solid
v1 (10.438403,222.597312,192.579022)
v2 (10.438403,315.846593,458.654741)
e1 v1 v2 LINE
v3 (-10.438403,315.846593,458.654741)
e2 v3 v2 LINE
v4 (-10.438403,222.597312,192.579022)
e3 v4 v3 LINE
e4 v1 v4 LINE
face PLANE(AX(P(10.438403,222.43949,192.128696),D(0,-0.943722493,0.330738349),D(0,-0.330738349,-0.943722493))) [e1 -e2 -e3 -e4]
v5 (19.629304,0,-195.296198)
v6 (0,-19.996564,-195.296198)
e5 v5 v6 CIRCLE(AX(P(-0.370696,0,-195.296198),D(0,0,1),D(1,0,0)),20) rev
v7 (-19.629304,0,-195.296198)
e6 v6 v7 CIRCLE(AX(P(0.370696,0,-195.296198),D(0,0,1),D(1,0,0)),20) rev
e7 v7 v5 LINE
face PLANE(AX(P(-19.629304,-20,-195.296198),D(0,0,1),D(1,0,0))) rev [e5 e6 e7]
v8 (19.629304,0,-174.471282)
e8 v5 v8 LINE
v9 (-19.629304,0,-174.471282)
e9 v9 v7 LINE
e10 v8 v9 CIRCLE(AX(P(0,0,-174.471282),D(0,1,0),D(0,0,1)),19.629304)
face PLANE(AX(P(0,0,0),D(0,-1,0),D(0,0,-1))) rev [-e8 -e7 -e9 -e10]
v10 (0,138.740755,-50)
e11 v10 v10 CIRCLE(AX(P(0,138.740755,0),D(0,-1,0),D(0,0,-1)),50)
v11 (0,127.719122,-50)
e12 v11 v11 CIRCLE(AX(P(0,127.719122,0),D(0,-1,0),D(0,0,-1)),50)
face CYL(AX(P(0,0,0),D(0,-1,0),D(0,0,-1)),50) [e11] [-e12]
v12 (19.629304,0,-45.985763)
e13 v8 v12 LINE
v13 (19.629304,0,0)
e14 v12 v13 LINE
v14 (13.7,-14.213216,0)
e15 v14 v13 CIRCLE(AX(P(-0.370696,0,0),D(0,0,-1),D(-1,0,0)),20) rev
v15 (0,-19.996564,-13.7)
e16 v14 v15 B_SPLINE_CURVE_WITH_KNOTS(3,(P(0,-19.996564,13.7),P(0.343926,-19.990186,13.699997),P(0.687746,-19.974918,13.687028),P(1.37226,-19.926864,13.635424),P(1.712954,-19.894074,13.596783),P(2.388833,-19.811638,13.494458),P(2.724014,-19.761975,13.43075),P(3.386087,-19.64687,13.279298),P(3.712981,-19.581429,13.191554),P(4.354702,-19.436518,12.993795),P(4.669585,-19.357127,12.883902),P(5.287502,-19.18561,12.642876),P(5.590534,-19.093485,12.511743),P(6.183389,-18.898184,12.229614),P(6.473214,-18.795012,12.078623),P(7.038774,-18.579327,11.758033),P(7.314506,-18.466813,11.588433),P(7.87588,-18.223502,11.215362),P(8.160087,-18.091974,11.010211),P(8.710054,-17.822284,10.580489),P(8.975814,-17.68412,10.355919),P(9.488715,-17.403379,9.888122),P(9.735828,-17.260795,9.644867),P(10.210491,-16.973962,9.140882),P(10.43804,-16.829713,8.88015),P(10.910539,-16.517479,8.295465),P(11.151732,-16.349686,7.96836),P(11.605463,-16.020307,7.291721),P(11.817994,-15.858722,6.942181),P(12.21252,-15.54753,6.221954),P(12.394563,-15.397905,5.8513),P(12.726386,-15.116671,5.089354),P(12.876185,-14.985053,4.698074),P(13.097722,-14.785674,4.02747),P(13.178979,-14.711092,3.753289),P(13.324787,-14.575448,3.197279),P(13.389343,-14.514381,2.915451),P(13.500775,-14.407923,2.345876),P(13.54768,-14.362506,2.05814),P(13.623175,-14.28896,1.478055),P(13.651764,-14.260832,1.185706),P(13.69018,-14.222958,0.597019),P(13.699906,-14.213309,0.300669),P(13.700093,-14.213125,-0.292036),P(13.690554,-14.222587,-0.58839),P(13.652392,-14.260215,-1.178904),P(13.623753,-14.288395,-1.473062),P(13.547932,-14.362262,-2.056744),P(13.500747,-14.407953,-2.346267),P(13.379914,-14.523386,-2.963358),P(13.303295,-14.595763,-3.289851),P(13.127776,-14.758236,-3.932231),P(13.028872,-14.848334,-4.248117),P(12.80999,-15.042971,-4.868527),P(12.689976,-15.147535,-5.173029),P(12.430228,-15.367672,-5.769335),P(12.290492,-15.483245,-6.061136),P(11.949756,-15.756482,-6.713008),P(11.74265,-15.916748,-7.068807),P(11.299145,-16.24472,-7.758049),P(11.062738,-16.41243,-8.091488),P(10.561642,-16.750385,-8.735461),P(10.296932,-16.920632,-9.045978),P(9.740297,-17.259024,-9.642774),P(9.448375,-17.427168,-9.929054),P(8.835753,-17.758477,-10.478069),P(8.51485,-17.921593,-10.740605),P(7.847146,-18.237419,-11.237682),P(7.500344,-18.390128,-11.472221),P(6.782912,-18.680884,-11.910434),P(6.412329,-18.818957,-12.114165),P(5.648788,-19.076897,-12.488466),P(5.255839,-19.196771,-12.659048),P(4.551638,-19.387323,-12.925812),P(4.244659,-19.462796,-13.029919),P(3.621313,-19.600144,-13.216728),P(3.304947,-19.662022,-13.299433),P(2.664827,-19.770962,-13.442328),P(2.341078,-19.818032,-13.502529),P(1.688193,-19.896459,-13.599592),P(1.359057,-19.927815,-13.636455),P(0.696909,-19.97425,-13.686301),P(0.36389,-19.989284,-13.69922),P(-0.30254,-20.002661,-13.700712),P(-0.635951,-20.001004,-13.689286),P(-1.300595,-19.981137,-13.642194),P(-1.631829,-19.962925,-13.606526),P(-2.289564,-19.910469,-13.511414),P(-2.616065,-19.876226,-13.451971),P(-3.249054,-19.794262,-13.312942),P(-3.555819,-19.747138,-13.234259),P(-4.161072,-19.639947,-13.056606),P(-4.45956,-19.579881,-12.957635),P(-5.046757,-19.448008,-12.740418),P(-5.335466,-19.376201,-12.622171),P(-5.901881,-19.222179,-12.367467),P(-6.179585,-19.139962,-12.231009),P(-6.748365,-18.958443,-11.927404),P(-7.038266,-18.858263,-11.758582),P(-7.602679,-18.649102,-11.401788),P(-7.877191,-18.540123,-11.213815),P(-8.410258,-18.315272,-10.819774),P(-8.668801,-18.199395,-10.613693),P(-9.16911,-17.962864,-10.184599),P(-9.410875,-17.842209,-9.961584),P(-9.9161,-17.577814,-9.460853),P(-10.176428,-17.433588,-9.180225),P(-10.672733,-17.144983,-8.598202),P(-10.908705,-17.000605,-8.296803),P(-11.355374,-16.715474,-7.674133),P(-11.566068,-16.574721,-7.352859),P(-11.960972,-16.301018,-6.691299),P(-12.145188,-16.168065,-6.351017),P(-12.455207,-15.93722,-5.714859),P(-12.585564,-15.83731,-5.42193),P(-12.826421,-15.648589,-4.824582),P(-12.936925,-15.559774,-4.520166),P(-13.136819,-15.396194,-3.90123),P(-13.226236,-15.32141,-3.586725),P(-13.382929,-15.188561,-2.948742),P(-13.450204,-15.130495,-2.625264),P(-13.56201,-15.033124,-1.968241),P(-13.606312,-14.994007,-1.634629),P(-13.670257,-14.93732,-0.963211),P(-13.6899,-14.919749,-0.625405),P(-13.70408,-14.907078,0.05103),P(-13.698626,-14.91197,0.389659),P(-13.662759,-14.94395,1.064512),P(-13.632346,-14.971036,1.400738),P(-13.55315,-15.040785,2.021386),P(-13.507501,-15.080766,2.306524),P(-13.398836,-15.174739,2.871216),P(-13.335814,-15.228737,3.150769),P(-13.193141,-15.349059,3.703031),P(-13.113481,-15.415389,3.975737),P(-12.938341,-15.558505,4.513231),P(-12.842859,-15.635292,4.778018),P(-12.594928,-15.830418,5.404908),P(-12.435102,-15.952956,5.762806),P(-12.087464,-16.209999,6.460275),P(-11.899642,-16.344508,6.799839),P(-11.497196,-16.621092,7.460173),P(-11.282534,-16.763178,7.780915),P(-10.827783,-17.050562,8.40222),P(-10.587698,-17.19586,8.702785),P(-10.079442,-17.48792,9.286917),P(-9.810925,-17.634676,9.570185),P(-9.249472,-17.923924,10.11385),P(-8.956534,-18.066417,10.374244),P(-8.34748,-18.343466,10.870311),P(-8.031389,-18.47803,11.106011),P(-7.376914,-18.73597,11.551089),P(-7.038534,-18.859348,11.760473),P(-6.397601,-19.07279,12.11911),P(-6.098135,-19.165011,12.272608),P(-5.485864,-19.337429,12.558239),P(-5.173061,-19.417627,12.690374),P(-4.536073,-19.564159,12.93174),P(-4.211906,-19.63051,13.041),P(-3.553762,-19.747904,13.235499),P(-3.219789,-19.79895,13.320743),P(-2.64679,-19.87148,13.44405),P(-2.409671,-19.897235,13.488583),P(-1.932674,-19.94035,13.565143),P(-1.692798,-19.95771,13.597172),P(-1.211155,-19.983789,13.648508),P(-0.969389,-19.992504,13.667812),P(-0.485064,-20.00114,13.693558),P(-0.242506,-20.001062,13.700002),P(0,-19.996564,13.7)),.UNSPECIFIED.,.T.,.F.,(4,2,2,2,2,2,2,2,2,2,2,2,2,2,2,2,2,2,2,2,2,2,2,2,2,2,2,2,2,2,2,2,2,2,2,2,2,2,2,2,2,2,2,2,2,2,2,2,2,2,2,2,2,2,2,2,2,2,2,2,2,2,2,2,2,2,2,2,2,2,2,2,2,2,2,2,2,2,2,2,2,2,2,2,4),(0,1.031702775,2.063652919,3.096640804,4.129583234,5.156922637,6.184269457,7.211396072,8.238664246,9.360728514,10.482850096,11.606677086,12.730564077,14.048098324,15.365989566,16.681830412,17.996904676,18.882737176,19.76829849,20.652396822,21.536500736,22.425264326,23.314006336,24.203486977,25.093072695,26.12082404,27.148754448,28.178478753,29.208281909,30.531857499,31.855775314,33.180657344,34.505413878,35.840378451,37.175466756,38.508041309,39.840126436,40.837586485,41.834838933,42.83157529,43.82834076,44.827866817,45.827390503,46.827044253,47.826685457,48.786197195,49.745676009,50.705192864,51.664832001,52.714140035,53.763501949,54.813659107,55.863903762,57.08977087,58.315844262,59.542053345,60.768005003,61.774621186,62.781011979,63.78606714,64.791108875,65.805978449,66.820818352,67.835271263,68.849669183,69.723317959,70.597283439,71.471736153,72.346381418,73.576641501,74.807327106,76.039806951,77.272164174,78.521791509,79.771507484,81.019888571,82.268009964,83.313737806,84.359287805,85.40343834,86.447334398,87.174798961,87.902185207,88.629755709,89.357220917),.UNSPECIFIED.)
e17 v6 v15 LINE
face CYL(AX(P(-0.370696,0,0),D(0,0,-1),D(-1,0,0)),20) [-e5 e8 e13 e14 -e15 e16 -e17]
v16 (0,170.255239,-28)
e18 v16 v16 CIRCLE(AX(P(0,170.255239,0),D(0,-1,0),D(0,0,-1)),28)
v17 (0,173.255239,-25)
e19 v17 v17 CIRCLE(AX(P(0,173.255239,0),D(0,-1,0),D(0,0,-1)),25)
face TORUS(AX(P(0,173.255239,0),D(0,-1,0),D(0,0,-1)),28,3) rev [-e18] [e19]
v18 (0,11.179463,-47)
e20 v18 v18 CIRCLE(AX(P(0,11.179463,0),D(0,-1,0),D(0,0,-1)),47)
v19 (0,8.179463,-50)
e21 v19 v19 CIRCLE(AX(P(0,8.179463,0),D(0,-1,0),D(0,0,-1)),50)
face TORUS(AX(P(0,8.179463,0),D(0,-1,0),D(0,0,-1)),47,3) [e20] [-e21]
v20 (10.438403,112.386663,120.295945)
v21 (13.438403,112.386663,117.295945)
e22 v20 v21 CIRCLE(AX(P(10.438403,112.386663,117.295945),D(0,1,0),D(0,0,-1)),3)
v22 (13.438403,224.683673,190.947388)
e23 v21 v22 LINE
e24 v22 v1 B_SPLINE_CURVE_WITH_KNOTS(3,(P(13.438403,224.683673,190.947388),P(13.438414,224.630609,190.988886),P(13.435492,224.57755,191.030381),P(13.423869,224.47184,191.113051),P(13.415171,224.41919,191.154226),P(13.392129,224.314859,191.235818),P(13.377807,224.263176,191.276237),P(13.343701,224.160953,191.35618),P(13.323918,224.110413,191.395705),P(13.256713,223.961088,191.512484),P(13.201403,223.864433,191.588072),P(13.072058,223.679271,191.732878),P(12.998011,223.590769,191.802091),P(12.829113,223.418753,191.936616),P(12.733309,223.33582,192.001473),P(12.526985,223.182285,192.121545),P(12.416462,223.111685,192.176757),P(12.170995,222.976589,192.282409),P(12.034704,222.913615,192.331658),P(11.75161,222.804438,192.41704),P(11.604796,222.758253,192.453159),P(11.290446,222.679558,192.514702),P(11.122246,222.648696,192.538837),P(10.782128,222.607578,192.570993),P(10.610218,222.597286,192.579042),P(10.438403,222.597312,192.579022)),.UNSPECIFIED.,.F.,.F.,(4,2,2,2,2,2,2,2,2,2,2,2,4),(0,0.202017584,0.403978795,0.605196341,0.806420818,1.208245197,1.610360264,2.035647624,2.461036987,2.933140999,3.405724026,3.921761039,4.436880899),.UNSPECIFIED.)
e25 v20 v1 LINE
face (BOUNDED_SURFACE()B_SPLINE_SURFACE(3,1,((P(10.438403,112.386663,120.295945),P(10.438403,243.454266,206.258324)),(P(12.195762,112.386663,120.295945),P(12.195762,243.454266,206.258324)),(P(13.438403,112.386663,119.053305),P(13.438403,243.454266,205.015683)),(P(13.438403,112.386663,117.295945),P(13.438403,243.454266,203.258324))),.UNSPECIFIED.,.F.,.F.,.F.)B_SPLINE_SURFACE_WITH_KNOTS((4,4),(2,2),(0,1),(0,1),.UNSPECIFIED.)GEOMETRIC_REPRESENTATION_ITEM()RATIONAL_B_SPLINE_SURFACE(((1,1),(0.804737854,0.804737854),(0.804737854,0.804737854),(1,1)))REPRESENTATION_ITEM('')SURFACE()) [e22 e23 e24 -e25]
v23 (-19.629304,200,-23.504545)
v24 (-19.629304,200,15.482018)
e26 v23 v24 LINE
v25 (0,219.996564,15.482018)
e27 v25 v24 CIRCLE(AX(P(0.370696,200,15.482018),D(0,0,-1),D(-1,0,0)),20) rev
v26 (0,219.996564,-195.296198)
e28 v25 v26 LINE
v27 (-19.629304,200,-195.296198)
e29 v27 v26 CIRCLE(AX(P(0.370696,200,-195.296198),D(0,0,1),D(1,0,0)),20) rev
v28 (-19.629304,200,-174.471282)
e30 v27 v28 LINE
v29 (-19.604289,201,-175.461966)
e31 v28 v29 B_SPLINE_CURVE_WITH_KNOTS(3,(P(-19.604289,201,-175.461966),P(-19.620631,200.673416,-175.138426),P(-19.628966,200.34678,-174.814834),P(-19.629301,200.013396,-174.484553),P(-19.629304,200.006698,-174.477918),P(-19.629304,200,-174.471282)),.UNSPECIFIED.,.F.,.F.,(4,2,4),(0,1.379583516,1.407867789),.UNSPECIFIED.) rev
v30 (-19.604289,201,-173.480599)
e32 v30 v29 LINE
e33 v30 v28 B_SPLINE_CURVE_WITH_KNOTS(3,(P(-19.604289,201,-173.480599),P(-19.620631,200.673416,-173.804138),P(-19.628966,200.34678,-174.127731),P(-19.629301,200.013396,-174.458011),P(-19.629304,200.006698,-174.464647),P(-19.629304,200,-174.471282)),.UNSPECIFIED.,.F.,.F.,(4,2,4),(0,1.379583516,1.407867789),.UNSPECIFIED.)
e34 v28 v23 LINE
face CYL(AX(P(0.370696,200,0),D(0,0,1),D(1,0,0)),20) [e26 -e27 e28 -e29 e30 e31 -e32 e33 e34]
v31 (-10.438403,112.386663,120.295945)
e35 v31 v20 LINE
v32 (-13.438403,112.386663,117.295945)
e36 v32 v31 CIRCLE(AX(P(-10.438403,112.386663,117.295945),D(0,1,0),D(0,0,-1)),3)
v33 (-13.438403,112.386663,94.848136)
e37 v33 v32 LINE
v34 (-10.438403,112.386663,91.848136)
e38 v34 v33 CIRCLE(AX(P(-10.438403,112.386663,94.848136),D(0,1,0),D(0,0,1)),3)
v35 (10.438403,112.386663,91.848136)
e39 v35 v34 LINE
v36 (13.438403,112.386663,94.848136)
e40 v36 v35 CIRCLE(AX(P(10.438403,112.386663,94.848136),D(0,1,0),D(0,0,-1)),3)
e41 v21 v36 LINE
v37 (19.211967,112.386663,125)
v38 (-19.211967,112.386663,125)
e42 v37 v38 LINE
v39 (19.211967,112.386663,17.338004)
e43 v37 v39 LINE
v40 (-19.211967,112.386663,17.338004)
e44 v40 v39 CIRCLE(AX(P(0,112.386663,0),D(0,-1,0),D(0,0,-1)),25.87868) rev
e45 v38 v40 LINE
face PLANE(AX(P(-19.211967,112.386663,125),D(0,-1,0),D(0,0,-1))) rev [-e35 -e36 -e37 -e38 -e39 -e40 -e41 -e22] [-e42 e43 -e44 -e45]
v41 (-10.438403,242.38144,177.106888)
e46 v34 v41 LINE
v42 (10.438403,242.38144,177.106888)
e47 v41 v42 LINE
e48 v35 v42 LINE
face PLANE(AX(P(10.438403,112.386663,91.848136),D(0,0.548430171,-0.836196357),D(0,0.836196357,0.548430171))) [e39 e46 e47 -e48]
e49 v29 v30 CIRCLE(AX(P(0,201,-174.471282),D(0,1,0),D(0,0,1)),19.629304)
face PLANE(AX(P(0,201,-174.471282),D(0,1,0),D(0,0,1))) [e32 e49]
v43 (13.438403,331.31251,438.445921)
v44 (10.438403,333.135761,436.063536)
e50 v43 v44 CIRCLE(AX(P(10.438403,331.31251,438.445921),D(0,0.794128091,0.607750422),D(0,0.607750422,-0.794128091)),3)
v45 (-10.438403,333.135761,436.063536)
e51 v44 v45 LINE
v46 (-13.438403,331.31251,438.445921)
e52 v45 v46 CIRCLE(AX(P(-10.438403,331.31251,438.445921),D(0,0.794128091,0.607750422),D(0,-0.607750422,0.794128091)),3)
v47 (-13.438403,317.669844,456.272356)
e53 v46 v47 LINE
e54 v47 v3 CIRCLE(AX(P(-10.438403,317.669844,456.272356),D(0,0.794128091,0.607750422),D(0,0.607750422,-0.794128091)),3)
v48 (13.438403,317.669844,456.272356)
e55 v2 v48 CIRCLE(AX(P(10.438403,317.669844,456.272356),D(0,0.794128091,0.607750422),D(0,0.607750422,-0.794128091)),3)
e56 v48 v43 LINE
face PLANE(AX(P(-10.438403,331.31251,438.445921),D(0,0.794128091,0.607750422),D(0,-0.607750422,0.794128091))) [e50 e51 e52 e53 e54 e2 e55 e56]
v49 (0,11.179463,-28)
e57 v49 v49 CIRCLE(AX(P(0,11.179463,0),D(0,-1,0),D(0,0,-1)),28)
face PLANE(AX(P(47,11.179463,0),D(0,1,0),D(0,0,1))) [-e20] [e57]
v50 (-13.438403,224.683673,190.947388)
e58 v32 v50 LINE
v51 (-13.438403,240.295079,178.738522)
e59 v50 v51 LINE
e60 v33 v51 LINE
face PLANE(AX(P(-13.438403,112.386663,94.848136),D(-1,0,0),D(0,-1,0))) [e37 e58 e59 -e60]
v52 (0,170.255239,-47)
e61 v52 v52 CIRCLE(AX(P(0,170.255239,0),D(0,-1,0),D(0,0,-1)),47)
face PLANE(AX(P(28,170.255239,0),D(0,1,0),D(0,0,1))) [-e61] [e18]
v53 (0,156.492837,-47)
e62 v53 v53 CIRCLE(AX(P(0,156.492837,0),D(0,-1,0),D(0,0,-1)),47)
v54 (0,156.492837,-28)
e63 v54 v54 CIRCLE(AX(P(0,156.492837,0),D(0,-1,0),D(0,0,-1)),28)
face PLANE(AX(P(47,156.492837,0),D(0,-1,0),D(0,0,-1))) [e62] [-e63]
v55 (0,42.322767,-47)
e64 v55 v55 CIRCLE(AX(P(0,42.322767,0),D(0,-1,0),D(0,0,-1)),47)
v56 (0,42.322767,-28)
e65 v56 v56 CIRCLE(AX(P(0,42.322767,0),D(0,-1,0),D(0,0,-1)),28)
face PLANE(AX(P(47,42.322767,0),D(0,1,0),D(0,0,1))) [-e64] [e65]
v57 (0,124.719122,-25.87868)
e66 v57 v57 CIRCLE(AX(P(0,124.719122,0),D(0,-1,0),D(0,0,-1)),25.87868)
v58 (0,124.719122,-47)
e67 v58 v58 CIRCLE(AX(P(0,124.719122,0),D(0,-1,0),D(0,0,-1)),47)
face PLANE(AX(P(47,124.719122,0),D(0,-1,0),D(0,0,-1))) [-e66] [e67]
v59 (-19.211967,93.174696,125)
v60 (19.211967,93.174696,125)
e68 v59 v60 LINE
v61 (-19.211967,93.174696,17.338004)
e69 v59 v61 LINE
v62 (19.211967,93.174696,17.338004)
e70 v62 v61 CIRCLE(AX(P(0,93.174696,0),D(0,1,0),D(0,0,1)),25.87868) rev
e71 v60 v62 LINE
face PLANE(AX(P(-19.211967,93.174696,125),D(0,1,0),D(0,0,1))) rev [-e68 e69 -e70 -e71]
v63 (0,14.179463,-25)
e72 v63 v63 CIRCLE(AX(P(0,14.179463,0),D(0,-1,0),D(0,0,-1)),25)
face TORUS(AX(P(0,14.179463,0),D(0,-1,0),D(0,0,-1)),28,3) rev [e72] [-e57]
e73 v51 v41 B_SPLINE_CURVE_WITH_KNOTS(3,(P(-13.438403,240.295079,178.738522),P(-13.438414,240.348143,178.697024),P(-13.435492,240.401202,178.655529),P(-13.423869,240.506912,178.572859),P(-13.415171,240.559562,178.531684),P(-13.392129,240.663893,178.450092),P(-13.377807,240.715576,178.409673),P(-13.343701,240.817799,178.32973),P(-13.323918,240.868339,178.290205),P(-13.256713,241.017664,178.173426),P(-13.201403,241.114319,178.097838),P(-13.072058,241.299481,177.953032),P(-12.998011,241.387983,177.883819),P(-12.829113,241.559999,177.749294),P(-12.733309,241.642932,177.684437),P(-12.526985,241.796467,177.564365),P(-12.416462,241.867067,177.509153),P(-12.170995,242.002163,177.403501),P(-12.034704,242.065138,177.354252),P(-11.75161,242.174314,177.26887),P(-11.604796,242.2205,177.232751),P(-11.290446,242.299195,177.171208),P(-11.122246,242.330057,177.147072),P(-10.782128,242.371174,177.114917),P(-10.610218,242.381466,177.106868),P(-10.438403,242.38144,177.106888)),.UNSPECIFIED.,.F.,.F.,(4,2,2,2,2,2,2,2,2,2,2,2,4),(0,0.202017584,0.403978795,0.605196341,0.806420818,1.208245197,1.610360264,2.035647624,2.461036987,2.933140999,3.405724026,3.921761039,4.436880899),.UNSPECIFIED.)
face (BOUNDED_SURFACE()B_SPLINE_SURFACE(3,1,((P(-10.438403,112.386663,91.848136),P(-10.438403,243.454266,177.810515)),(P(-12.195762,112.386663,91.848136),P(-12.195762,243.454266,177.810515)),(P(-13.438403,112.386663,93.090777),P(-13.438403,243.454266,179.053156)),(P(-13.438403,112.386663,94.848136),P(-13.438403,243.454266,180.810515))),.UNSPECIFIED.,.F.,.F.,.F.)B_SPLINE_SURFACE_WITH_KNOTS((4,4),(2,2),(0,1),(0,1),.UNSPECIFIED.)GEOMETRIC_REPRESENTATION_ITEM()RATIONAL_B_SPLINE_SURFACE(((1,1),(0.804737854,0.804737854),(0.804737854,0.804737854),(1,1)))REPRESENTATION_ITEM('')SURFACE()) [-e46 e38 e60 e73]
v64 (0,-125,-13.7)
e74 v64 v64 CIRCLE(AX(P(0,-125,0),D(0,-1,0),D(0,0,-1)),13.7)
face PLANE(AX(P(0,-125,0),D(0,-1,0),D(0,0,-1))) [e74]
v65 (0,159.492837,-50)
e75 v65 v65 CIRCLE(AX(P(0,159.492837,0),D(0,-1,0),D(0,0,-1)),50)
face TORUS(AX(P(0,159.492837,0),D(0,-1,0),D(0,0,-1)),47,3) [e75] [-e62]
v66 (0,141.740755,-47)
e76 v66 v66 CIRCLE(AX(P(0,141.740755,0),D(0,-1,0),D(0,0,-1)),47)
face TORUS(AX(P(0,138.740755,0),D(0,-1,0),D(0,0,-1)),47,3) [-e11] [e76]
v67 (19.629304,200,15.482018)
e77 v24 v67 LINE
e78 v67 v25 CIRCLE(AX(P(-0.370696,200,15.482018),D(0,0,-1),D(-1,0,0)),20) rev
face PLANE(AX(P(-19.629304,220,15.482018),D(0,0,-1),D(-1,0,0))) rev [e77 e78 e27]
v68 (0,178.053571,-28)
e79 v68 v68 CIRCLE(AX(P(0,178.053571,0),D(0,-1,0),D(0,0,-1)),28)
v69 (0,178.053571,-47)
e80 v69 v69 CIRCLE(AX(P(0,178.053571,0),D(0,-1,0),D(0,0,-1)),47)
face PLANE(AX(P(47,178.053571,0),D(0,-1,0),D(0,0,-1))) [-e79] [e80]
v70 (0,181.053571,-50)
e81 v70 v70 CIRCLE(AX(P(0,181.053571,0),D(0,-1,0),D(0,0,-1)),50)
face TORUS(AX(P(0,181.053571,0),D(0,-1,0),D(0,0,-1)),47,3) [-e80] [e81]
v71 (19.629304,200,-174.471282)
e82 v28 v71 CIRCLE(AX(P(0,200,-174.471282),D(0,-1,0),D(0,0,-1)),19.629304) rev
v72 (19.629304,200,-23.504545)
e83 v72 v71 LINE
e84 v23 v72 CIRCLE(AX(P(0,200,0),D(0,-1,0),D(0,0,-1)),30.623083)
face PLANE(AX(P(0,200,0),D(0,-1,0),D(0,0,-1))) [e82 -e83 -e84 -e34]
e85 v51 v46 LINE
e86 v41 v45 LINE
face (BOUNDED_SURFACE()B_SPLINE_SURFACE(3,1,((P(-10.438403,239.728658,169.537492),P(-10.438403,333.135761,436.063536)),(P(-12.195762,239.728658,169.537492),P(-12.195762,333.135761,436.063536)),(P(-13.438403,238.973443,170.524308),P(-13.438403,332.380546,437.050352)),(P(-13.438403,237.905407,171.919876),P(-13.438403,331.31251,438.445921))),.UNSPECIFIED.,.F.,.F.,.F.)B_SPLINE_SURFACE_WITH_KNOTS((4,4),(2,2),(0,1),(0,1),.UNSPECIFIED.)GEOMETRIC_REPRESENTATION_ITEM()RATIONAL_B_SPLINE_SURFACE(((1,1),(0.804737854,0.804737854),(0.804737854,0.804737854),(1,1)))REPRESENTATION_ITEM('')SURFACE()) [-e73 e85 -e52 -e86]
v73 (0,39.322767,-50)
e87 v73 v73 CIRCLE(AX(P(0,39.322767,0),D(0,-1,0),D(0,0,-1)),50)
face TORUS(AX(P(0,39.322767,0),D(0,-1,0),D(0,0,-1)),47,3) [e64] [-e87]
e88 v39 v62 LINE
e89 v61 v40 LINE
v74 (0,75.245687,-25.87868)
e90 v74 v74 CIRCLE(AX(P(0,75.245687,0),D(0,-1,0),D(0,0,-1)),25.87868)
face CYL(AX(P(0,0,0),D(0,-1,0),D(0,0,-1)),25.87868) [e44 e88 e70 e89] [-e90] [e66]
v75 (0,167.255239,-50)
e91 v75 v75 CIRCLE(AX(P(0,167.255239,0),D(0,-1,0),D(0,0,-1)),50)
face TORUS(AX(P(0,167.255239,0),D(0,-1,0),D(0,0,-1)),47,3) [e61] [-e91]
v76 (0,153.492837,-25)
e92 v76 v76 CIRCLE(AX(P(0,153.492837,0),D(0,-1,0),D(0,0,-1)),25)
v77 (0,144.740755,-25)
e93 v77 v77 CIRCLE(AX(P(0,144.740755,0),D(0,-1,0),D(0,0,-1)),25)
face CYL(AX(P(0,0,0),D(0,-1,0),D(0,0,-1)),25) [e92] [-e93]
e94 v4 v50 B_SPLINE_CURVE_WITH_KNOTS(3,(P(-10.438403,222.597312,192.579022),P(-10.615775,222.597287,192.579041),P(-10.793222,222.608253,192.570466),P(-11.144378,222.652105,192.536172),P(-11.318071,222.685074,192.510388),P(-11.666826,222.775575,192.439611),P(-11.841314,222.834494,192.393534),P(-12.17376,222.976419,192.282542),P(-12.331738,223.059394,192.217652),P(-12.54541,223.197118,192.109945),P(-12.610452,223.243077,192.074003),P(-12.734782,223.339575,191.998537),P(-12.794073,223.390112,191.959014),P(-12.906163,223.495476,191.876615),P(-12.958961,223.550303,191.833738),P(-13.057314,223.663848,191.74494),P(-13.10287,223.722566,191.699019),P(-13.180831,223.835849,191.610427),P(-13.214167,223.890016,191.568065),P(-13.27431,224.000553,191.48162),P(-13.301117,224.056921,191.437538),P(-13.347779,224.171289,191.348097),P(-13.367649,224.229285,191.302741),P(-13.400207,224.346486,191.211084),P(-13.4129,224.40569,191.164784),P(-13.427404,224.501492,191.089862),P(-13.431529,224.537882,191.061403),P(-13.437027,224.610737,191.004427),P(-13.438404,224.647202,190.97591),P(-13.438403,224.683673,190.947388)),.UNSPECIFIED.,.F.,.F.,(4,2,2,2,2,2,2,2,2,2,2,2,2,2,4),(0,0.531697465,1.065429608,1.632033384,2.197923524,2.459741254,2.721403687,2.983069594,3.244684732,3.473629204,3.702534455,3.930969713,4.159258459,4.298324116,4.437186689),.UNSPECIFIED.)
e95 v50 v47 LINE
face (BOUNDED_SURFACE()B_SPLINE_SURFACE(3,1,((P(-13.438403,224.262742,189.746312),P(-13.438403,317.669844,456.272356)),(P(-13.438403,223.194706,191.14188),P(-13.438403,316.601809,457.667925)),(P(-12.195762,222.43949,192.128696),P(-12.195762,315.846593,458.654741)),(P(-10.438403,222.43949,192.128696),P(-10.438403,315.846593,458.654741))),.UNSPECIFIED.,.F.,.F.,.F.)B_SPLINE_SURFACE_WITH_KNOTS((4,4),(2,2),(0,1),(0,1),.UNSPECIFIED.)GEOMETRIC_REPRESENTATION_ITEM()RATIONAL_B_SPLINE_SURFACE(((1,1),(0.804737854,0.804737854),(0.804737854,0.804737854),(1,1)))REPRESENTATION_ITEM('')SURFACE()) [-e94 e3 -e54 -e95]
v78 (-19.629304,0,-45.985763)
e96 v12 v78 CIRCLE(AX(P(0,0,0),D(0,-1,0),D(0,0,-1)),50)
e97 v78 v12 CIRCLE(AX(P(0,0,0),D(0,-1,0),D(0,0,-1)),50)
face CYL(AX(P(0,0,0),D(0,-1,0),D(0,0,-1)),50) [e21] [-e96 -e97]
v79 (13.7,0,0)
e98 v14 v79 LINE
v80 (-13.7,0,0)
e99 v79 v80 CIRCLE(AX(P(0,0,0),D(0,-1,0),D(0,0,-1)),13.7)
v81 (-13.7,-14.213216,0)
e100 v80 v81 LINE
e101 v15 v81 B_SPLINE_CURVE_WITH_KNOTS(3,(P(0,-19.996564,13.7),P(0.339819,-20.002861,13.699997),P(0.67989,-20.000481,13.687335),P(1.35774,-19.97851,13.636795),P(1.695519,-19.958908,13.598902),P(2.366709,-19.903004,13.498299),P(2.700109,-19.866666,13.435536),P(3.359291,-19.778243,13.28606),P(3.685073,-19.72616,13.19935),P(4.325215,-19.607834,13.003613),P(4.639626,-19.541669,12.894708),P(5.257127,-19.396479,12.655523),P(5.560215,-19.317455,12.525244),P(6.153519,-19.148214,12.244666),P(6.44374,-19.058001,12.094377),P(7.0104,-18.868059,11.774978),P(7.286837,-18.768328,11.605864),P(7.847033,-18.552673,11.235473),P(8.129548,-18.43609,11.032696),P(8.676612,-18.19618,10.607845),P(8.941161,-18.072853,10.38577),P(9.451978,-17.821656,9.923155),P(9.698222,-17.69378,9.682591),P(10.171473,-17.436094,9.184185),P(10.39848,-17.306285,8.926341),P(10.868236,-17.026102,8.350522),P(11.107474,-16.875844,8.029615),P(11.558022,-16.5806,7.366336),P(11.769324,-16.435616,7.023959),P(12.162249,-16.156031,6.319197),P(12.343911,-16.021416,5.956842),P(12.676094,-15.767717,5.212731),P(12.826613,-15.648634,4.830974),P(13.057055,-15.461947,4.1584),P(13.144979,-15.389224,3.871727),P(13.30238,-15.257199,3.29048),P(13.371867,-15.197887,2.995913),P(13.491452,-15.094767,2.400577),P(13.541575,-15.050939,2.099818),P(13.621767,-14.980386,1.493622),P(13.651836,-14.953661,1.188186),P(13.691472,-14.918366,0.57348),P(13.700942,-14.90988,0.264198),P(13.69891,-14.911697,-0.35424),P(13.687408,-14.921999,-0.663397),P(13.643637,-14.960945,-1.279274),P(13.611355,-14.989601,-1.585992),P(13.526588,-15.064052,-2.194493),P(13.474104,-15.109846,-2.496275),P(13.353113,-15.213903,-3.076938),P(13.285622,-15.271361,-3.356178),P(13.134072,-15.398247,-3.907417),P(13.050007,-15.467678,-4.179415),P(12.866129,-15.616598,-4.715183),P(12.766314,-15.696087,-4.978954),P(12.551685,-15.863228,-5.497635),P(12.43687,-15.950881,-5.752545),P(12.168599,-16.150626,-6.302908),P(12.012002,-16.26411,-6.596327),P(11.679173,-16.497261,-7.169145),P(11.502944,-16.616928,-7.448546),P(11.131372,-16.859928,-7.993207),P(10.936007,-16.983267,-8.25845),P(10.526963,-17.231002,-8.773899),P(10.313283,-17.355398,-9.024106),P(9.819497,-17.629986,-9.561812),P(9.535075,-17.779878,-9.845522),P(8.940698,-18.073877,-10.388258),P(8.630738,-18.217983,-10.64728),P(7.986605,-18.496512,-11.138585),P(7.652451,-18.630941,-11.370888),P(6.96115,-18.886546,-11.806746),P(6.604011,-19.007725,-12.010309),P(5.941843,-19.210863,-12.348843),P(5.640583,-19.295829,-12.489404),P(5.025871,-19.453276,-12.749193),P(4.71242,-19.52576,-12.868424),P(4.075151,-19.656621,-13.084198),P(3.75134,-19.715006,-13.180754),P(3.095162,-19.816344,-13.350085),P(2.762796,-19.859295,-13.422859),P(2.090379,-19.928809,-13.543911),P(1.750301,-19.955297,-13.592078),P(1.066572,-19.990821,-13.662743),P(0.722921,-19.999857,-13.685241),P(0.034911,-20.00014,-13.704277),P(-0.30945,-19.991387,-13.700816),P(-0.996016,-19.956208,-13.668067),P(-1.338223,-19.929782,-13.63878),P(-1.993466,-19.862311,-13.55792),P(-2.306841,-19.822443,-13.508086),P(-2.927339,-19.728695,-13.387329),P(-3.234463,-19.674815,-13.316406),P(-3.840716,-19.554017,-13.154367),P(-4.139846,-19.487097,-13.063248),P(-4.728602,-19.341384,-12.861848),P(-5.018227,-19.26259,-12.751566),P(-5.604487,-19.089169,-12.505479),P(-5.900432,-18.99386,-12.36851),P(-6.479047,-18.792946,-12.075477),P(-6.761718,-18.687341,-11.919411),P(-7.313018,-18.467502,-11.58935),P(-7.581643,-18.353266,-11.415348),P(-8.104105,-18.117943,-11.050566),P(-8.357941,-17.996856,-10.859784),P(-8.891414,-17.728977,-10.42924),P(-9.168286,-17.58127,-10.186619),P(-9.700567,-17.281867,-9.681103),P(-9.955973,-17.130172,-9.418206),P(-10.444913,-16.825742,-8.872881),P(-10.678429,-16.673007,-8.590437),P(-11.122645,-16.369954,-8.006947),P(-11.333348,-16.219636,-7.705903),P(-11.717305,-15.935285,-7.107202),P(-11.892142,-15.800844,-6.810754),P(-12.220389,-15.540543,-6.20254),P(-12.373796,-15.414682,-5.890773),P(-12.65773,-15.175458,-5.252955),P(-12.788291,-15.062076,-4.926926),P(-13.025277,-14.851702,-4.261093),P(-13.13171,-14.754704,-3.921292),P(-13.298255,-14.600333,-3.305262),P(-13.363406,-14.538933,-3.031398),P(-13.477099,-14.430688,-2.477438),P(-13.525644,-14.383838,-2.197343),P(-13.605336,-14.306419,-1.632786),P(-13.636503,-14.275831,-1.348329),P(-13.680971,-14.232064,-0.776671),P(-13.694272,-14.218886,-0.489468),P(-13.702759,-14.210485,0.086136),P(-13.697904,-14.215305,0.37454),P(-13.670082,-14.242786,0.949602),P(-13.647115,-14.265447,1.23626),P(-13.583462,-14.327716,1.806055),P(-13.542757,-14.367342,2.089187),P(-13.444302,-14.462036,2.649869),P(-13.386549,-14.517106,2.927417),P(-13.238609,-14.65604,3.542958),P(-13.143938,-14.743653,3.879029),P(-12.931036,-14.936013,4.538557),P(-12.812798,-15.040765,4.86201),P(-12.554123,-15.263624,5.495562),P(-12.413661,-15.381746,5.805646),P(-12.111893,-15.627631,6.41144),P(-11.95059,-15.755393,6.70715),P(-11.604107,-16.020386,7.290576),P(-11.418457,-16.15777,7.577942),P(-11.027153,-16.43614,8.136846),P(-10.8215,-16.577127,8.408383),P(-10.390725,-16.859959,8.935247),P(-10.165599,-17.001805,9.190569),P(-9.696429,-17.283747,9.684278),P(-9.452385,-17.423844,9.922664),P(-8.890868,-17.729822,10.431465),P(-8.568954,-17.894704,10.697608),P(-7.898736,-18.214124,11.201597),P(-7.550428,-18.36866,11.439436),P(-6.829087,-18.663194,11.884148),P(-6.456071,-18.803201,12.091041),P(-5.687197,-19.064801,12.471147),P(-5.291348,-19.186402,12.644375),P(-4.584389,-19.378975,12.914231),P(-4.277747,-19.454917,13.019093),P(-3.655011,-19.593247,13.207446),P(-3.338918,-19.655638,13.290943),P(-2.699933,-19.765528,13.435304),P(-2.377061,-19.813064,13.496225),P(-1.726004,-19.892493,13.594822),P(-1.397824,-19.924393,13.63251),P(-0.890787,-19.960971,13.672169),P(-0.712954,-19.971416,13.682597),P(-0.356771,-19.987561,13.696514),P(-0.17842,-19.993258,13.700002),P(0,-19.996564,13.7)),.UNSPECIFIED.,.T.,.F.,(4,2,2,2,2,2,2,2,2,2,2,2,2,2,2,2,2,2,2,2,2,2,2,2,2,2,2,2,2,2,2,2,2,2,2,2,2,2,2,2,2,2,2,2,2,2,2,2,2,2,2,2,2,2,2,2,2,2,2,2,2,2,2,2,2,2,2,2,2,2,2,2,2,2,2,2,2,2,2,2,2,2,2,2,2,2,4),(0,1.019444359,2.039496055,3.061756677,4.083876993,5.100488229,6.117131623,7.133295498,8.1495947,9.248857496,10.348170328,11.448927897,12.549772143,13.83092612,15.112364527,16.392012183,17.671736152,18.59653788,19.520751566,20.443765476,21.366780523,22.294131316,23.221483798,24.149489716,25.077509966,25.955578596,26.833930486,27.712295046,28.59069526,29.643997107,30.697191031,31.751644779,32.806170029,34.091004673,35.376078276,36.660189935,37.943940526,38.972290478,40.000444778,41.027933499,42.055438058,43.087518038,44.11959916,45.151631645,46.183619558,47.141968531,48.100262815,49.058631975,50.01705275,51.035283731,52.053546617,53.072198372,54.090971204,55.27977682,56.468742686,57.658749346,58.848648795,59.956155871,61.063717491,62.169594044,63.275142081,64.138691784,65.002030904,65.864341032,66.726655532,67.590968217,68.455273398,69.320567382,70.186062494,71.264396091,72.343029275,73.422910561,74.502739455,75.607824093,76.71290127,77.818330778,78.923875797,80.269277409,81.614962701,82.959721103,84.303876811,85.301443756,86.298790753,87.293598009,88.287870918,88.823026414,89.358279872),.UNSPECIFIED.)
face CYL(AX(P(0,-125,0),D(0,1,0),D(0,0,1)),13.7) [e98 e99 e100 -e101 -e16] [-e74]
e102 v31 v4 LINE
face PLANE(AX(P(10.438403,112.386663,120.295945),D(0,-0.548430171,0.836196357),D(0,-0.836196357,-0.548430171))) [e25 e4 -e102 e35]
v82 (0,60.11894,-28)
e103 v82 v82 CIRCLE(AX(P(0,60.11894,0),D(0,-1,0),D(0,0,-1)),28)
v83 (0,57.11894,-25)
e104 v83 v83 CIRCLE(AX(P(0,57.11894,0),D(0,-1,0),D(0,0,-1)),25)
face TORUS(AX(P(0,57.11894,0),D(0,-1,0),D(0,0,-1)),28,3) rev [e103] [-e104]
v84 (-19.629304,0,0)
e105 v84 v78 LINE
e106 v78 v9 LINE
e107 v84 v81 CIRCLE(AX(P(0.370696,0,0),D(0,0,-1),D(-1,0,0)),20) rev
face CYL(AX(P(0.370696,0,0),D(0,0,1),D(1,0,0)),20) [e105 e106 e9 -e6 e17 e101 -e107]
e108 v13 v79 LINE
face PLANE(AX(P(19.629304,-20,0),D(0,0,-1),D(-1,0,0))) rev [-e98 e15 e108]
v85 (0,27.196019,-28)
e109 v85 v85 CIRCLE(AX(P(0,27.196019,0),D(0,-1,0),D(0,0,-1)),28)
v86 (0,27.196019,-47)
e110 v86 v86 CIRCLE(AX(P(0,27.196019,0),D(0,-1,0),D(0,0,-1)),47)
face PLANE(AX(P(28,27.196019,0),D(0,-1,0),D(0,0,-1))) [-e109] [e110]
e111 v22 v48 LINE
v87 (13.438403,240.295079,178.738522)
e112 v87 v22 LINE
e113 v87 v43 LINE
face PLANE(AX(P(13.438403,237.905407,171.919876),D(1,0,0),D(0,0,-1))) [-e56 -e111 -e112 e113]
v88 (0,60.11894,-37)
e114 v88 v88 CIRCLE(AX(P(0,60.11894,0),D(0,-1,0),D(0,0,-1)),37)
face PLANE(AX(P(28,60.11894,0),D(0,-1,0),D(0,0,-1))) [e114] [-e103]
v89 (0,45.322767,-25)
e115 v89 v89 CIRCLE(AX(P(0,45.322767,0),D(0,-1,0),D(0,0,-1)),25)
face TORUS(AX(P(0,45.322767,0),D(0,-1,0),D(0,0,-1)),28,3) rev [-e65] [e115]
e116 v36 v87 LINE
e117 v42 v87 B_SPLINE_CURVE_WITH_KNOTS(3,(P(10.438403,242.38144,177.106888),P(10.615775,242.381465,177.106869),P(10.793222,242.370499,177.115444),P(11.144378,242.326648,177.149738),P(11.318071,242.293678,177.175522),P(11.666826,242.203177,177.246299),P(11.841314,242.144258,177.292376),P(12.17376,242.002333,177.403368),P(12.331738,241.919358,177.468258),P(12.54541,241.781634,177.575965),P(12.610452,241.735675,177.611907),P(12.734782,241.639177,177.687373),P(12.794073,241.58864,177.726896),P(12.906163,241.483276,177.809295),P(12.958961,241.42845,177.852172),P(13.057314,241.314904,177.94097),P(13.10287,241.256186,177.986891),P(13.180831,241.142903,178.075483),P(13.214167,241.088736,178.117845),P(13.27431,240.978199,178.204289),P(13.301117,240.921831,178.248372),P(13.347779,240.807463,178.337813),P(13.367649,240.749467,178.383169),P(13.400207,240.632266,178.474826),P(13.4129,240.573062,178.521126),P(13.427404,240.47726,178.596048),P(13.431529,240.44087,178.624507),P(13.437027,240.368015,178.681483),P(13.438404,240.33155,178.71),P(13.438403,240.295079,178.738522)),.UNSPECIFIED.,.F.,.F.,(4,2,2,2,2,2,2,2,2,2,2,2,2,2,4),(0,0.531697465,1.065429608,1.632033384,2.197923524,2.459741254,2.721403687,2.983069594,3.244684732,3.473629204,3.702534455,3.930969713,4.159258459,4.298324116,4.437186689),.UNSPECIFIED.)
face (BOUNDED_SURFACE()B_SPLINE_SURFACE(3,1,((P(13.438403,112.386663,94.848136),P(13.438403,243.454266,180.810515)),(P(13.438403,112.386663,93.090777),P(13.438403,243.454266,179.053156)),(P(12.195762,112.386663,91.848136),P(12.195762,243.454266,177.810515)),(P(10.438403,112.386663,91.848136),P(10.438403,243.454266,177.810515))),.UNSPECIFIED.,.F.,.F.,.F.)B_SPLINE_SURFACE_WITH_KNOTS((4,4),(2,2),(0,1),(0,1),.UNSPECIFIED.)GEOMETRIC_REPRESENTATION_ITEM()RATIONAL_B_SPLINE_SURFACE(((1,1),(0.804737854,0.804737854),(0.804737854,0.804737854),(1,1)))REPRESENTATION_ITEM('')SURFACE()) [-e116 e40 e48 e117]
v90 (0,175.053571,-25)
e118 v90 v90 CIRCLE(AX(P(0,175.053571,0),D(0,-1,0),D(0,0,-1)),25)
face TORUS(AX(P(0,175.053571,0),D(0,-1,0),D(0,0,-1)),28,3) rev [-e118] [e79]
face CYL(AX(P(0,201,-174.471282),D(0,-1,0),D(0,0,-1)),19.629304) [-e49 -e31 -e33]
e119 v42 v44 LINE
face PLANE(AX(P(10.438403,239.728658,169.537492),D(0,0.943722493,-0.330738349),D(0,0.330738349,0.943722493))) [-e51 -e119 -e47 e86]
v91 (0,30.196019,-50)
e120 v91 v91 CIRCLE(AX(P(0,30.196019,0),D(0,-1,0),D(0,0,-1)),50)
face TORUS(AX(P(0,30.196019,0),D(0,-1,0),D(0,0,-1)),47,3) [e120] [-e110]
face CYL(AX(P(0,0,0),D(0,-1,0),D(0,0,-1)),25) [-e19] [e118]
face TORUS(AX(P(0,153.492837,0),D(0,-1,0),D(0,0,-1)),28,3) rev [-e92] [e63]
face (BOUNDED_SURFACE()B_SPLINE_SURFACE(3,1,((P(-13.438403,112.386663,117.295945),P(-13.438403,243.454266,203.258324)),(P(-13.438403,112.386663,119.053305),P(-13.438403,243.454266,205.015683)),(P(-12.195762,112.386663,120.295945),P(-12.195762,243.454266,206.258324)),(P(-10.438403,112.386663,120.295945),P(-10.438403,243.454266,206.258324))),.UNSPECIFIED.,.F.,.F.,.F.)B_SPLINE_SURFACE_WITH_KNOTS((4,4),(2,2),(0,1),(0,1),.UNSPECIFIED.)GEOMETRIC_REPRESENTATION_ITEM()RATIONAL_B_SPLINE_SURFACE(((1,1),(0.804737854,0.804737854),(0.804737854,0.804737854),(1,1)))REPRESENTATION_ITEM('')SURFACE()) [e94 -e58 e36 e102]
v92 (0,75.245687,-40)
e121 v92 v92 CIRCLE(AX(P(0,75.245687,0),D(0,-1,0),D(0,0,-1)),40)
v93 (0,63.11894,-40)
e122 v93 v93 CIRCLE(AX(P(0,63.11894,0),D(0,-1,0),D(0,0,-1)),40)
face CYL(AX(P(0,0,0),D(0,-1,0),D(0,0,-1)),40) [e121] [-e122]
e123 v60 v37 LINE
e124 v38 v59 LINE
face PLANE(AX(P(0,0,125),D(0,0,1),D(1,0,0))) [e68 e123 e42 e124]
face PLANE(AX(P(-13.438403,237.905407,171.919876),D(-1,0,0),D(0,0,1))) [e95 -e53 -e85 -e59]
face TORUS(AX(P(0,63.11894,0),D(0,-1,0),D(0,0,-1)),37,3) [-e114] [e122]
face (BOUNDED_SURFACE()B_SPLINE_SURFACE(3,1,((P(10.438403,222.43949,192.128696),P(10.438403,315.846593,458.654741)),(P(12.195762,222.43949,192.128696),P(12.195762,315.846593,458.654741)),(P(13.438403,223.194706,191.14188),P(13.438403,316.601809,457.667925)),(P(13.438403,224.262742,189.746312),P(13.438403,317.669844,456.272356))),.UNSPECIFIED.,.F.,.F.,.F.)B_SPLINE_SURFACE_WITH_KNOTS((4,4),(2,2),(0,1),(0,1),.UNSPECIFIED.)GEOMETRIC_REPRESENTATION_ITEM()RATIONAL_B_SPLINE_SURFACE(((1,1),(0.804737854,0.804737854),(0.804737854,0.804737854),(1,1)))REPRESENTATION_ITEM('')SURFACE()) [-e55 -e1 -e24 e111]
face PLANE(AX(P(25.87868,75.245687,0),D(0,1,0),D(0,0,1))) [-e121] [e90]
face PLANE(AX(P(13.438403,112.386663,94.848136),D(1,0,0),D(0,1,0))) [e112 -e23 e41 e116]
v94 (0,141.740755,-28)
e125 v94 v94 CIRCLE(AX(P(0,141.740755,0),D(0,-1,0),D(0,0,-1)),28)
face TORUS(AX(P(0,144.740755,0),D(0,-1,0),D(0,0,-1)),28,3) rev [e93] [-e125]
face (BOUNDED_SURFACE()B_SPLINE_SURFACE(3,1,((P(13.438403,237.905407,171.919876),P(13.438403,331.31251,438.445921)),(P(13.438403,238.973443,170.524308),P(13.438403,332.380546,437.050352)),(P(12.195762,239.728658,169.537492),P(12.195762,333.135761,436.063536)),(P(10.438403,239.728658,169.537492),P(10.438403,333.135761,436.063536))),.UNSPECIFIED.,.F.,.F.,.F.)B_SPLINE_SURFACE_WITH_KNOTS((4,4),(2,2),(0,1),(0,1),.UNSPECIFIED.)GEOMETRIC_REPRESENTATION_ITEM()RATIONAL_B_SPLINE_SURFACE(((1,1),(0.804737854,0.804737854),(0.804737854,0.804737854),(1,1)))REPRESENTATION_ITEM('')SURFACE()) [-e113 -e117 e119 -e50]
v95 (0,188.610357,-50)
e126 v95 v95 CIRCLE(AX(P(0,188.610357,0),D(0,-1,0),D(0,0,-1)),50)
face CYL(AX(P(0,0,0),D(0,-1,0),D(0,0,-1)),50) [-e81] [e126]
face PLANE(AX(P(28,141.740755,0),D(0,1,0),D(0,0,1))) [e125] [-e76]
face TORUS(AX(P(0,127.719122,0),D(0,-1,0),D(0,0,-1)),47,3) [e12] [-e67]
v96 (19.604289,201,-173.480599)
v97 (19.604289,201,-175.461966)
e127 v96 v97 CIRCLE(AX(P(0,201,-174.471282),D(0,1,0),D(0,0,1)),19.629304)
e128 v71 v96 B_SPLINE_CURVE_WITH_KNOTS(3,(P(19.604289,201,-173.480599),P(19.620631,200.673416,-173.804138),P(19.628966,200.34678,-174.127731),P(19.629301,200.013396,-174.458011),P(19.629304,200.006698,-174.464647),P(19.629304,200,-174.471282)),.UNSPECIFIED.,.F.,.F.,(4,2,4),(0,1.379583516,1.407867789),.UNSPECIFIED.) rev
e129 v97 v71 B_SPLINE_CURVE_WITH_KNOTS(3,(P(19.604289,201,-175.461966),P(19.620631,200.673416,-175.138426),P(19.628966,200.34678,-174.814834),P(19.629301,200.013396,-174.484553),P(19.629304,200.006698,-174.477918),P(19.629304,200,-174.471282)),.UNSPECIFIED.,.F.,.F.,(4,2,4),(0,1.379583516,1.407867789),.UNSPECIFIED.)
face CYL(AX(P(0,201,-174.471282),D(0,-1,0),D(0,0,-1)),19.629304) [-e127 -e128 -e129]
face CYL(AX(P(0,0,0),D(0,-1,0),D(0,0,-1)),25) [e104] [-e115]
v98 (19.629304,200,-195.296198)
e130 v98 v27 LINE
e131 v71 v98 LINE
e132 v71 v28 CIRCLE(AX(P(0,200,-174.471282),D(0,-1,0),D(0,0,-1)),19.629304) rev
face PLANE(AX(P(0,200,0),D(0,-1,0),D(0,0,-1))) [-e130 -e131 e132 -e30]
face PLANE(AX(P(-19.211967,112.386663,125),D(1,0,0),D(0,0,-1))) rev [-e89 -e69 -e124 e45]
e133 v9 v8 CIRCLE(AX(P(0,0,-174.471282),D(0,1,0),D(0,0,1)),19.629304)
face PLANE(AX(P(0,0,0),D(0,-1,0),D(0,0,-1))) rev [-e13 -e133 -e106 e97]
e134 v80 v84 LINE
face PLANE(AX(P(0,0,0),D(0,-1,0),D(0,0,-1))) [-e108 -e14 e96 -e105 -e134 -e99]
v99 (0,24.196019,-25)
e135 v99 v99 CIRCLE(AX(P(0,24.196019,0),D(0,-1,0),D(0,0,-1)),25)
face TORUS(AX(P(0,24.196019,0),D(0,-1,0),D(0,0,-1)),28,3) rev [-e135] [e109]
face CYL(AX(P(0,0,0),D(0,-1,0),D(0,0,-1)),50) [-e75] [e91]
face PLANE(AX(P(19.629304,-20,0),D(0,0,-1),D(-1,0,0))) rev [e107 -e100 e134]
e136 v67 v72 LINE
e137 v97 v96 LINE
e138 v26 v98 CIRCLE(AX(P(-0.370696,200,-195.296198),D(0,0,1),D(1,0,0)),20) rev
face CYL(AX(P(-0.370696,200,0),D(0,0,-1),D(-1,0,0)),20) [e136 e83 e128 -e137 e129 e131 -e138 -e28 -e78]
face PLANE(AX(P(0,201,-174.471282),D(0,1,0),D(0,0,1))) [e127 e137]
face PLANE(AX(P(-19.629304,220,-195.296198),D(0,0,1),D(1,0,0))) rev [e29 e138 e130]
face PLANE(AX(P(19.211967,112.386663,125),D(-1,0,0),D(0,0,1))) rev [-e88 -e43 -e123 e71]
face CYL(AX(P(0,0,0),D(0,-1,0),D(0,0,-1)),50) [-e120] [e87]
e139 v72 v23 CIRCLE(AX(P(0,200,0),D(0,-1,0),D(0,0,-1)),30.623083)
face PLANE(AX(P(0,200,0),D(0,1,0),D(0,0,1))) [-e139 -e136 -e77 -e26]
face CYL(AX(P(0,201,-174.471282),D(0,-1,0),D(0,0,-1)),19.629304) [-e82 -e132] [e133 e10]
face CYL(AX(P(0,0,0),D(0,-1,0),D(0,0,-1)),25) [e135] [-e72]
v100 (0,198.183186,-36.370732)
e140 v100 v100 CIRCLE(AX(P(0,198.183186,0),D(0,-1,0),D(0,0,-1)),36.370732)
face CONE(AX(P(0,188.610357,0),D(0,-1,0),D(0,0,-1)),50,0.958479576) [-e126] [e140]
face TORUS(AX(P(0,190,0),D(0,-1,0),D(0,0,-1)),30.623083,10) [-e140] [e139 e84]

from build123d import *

# Parameters (mm, degrees)
CROQUIS3_W              = 39.25860833
CROQUIS3_H              = 210.778215778
SALIENTE_EXTRUIR1_DEPTH = 20
REDONDEO1_R             = 20
CROQUIS4_W              = 39.25860833
CROQUIS4_H              = 195.29619761
SALIENTE_EXTRUIR2_DEPTH = 20
REDONDEO2_R             = 20
CROQUIS5_R              = 19.629304165
SALIENTE_EXTRUIR3_DEPTH = 201
CROQUIS6_W              = 38.423934492
CROQUIS6_H              = 19.211967246
SALIENTE_EXTRUIR4_DEPTH = 125
CROQUIS8_R              = 13.7
SALIENTE_EXTRUIR5_DEPTH = 125


with BuildPart() as part:
    # Croquis2 → Revolución2 (revolve)
    with BuildSketch(Plane.XY, mode=Mode.PRIVATE) as revoluci_n2_sk:
        with BuildLine():
            Line((0, 0), (50, 0))
            Line((50, 0), (50, 8.179463204))
            ThreePointArc((50, 8.179463204), (49.121320344, 10.300783548), (47, 11.179463204))
            Line((47, 11.179463204), (28, 11.179463204))
            ThreePointArc((28, 11.179463204), (25.878679656, 12.058142861), (25, 14.179463204))
            Line((25, 14.179463204), (25, 24.19601925))
            ThreePointArc((25, 24.19601925), (25.878679656, 26.317339593), (28, 27.19601925))
            Line((28, 27.19601925), (47, 27.19601925))
            ThreePointArc((47, 27.19601925), (49.121320344, 28.074698906), (50, 30.19601925))
            Line((50, 30.19601925), (50, 39.322766626))
            ThreePointArc((50, 39.322766626), (49.121320344, 41.44408697), (47, 42.322766626))
            Line((47, 42.322766626), (28, 42.322766626))
            ThreePointArc((28, 42.322766626), (25.878679656, 43.201446283), (25, 45.322766626))
            Line((25, 45.322766626), (25, 57.118940011))
            ThreePointArc((25, 57.118940011), (25.878679656, 59.240260354), (28, 60.118940011))
            Line((28, 60.118940011), (37, 60.118940011))
            ThreePointArc((37, 60.118940011), (39.121320344, 60.997619667), (40, 63.118940011))
            Line((40, 63.118940011), (40, 75.245687387))
            Line((40, 75.245687387), (25.878679656, 75.245687387))
            Line((25.878679656, 75.245687387), (25.878679656, 124.719122396))
            Line((25.878679656, 124.719122396), (47, 124.719122396))
            ThreePointArc((47, 124.719122396), (49.121320344, 125.597802053), (50, 127.719122396))
            Line((50, 127.719122396), (50, 138.740755007))
            ThreePointArc((50, 138.740755007), (49.121320344, 140.862075351), (47, 141.740755007))
            Line((47, 141.740755007), (28, 141.740755007))
            ThreePointArc((28, 141.740755007), (25.878679656, 142.619434663), (25, 144.740755007))
            Line((25, 144.740755007), (25, 153.492836603))
            ThreePointArc((25, 153.492836603), (25.878679656, 155.614156947), (28, 156.492836603))
            Line((28, 156.492836603), (47, 156.492836603))
            ThreePointArc((47, 156.492836603), (49.121320344, 157.371516259), (50, 159.492836603))
            Line((50, 159.492836603), (50, 167.255239291))
            ThreePointArc((50, 167.255239291), (49.121320344, 169.376559635), (47, 170.255239291))
            Line((47, 170.255239291), (28, 170.255239291))
            ThreePointArc((28, 170.255239291), (25.878679656, 171.133918947), (25, 173.255239291))
            Line((25, 173.255239291), (25, 175.053571243))
            ThreePointArc((25, 175.053571243), (25.878679656, 177.174891587), (28, 178.053571243))
            Line((28, 178.053571243), (47, 178.053571243))
            ThreePointArc((47, 178.053571243), (49.121320344, 178.9322509), (50, 181.053571243))
            Line((50, 181.053571243), (50, 188.610357417))
            Line((50, 188.610357417), (36.370731762, 198.183186285))
            ThreePointArc((36.370731762, 198.183186285), (33.637062214, 199.534984605), (30.623083353, 200))
            Line((30.623083353, 200), (0, 200))
            Line((0, 200), (0, 0))
        make_face()
    revolve(revoluci_n2_sk.sketch.rotate(Axis((0, 0, 0), (0, 1, 0)), 90), axis=Axis((0, 0, 0), (0, 1, 0)))

    # Croquis3 → Saliente-Extruir1 (add)
    with BuildSketch(Plane(origin=(0, 200, 0), x_dir=(1, 0, 0), z_dir=(0, 1, 0))):
        with Locations((0, 89.907089721)):
            Rectangle(CROQUIS3_W, CROQUIS3_H)
    extrude(amount=SALIENTE_EXTRUIR1_DEPTH)

    # Redondeo1
    # the kernel refuses this fillet: 20 mm, written as the material it takes off along each edge
    with BuildSketch(Plane(origin=(-19.629304165, 220, -245.29619761), x_dir=(0, -1, 0), z_dir=(0, 0, 1)), Plane(origin=(19.629304165, 220, 65.482018168), x_dir=(0, -1, 0), z_dir=(0, 0, -1))) as redondeo1_piece_1:
        with BuildLine():
            CenterArc((REDONDEO1_R, REDONDEO1_R), REDONDEO1_R, 180, 90)
            Line((0, REDONDEO1_R), (0, 0))
            Line((0, 0), (REDONDEO1_R, 0))
        make_face()
    extrude(amount=310.778215777, mode=Mode.SUBTRACT)

    # Croquis4 → Saliente-Extruir2 (add)
    with BuildSketch(Plane.XZ):
        with Locations((0, -97.648098805)):
            Rectangle(CROQUIS4_W, CROQUIS4_H)
    extrude(amount=SALIENTE_EXTRUIR2_DEPTH)

    # Redondeo2
    # the kernel refuses this fillet: 20 mm, written as the material it takes off along each edge
    with BuildSketch(Plane(origin=(-19.629304165, -20, 50), x_dir=(0, 1, 0), z_dir=(0, 0, -1)), Plane(origin=(19.629304165, -20, -245.29619761), x_dir=(0, 1, 0), z_dir=(0, 0, 1))) as redondeo2_piece_1:
        with BuildLine():
            CenterArc((REDONDEO2_R, REDONDEO2_R), REDONDEO2_R, 180, 90)
            Line((0, REDONDEO2_R), (0, 0))
            Line((0, 0), (REDONDEO2_R, 0))
        make_face()
    extrude(amount=295.29619761, mode=Mode.SUBTRACT)

    # Croquis5 → Saliente-Extruir3 (add)
    with BuildSketch(Plane(origin=(0, 0, 0), x_dir=(1, 0, 0), z_dir=(0, 1, 0))):
        with Locations(Location((0, 174.471282207, 0), (0, 0, 180))):
            Circle(CROQUIS5_R)
    extrude(amount=SALIENTE_EXTRUIR3_DEPTH)

    # Croquis6 → Saliente-Extruir4 (add)
    with BuildSketch(Plane.XY):
        with Locations((0, 102.78067947)):
            Rectangle(CROQUIS6_W, CROQUIS6_H)
    extrude(amount=SALIENTE_EXTRUIR4_DEPTH)

    # Barrer1: sweep along a curve in space
    with BuildLine() as barrer1_path:
        Line((0, 112.386663093, 106.072040946), (0, 232.48937605, 184.842954986))
        Line((0, 232.48937605, 184.842954986), (0, 324.491177071, 447.359138572))
    # Croquis7 → Barrer1 (sweep)
    with BuildSketch(Plane(origin=(0, 112.386663093, 0), x_dir=(1, 0, 0), z_dir=(0, 1, 0))):
        with BuildLine():
            Line((10.438402565, -91.848136446), (-10.438402565, -91.848136446))
            ThreePointArc((-10.438402565, -91.848136446), (-12.559722908, -92.726816103), (-13.438402565, -94.848136446))
            Line((-13.438402565, -94.848136446), (-13.438402565, -117.295945446))
            ThreePointArc((-13.438402565, -117.295945446), (-12.559722908, -119.41726579), (-10.438402565, -120.295945446))
            Line((-10.438402565, -120.295945446), (10.438402565, -120.295945446))
            ThreePointArc((10.438402565, -120.295945446), (12.559722908, -119.41726579), (13.438402565, -117.295945446))
            Line((13.438402565, -117.295945446), (13.438402565, -94.848136446))
            ThreePointArc((13.438402565, -94.848136446), (12.559722908, -92.726816103), (10.438402565, -91.848136446))
        make_face()
    sweep(path=barrer1_path.line, transition=Transition.RIGHT)

    # Croquis8 → Saliente-Extruir5 (add)
    with BuildSketch(Plane.XZ):
        with Locations(Location((0, 0, 0), (0, 0, 270))):
            Circle(CROQUIS8_R)
    extrude(amount=SALIENTE_EXTRUIR5_DEPTH)


solid = part.part
